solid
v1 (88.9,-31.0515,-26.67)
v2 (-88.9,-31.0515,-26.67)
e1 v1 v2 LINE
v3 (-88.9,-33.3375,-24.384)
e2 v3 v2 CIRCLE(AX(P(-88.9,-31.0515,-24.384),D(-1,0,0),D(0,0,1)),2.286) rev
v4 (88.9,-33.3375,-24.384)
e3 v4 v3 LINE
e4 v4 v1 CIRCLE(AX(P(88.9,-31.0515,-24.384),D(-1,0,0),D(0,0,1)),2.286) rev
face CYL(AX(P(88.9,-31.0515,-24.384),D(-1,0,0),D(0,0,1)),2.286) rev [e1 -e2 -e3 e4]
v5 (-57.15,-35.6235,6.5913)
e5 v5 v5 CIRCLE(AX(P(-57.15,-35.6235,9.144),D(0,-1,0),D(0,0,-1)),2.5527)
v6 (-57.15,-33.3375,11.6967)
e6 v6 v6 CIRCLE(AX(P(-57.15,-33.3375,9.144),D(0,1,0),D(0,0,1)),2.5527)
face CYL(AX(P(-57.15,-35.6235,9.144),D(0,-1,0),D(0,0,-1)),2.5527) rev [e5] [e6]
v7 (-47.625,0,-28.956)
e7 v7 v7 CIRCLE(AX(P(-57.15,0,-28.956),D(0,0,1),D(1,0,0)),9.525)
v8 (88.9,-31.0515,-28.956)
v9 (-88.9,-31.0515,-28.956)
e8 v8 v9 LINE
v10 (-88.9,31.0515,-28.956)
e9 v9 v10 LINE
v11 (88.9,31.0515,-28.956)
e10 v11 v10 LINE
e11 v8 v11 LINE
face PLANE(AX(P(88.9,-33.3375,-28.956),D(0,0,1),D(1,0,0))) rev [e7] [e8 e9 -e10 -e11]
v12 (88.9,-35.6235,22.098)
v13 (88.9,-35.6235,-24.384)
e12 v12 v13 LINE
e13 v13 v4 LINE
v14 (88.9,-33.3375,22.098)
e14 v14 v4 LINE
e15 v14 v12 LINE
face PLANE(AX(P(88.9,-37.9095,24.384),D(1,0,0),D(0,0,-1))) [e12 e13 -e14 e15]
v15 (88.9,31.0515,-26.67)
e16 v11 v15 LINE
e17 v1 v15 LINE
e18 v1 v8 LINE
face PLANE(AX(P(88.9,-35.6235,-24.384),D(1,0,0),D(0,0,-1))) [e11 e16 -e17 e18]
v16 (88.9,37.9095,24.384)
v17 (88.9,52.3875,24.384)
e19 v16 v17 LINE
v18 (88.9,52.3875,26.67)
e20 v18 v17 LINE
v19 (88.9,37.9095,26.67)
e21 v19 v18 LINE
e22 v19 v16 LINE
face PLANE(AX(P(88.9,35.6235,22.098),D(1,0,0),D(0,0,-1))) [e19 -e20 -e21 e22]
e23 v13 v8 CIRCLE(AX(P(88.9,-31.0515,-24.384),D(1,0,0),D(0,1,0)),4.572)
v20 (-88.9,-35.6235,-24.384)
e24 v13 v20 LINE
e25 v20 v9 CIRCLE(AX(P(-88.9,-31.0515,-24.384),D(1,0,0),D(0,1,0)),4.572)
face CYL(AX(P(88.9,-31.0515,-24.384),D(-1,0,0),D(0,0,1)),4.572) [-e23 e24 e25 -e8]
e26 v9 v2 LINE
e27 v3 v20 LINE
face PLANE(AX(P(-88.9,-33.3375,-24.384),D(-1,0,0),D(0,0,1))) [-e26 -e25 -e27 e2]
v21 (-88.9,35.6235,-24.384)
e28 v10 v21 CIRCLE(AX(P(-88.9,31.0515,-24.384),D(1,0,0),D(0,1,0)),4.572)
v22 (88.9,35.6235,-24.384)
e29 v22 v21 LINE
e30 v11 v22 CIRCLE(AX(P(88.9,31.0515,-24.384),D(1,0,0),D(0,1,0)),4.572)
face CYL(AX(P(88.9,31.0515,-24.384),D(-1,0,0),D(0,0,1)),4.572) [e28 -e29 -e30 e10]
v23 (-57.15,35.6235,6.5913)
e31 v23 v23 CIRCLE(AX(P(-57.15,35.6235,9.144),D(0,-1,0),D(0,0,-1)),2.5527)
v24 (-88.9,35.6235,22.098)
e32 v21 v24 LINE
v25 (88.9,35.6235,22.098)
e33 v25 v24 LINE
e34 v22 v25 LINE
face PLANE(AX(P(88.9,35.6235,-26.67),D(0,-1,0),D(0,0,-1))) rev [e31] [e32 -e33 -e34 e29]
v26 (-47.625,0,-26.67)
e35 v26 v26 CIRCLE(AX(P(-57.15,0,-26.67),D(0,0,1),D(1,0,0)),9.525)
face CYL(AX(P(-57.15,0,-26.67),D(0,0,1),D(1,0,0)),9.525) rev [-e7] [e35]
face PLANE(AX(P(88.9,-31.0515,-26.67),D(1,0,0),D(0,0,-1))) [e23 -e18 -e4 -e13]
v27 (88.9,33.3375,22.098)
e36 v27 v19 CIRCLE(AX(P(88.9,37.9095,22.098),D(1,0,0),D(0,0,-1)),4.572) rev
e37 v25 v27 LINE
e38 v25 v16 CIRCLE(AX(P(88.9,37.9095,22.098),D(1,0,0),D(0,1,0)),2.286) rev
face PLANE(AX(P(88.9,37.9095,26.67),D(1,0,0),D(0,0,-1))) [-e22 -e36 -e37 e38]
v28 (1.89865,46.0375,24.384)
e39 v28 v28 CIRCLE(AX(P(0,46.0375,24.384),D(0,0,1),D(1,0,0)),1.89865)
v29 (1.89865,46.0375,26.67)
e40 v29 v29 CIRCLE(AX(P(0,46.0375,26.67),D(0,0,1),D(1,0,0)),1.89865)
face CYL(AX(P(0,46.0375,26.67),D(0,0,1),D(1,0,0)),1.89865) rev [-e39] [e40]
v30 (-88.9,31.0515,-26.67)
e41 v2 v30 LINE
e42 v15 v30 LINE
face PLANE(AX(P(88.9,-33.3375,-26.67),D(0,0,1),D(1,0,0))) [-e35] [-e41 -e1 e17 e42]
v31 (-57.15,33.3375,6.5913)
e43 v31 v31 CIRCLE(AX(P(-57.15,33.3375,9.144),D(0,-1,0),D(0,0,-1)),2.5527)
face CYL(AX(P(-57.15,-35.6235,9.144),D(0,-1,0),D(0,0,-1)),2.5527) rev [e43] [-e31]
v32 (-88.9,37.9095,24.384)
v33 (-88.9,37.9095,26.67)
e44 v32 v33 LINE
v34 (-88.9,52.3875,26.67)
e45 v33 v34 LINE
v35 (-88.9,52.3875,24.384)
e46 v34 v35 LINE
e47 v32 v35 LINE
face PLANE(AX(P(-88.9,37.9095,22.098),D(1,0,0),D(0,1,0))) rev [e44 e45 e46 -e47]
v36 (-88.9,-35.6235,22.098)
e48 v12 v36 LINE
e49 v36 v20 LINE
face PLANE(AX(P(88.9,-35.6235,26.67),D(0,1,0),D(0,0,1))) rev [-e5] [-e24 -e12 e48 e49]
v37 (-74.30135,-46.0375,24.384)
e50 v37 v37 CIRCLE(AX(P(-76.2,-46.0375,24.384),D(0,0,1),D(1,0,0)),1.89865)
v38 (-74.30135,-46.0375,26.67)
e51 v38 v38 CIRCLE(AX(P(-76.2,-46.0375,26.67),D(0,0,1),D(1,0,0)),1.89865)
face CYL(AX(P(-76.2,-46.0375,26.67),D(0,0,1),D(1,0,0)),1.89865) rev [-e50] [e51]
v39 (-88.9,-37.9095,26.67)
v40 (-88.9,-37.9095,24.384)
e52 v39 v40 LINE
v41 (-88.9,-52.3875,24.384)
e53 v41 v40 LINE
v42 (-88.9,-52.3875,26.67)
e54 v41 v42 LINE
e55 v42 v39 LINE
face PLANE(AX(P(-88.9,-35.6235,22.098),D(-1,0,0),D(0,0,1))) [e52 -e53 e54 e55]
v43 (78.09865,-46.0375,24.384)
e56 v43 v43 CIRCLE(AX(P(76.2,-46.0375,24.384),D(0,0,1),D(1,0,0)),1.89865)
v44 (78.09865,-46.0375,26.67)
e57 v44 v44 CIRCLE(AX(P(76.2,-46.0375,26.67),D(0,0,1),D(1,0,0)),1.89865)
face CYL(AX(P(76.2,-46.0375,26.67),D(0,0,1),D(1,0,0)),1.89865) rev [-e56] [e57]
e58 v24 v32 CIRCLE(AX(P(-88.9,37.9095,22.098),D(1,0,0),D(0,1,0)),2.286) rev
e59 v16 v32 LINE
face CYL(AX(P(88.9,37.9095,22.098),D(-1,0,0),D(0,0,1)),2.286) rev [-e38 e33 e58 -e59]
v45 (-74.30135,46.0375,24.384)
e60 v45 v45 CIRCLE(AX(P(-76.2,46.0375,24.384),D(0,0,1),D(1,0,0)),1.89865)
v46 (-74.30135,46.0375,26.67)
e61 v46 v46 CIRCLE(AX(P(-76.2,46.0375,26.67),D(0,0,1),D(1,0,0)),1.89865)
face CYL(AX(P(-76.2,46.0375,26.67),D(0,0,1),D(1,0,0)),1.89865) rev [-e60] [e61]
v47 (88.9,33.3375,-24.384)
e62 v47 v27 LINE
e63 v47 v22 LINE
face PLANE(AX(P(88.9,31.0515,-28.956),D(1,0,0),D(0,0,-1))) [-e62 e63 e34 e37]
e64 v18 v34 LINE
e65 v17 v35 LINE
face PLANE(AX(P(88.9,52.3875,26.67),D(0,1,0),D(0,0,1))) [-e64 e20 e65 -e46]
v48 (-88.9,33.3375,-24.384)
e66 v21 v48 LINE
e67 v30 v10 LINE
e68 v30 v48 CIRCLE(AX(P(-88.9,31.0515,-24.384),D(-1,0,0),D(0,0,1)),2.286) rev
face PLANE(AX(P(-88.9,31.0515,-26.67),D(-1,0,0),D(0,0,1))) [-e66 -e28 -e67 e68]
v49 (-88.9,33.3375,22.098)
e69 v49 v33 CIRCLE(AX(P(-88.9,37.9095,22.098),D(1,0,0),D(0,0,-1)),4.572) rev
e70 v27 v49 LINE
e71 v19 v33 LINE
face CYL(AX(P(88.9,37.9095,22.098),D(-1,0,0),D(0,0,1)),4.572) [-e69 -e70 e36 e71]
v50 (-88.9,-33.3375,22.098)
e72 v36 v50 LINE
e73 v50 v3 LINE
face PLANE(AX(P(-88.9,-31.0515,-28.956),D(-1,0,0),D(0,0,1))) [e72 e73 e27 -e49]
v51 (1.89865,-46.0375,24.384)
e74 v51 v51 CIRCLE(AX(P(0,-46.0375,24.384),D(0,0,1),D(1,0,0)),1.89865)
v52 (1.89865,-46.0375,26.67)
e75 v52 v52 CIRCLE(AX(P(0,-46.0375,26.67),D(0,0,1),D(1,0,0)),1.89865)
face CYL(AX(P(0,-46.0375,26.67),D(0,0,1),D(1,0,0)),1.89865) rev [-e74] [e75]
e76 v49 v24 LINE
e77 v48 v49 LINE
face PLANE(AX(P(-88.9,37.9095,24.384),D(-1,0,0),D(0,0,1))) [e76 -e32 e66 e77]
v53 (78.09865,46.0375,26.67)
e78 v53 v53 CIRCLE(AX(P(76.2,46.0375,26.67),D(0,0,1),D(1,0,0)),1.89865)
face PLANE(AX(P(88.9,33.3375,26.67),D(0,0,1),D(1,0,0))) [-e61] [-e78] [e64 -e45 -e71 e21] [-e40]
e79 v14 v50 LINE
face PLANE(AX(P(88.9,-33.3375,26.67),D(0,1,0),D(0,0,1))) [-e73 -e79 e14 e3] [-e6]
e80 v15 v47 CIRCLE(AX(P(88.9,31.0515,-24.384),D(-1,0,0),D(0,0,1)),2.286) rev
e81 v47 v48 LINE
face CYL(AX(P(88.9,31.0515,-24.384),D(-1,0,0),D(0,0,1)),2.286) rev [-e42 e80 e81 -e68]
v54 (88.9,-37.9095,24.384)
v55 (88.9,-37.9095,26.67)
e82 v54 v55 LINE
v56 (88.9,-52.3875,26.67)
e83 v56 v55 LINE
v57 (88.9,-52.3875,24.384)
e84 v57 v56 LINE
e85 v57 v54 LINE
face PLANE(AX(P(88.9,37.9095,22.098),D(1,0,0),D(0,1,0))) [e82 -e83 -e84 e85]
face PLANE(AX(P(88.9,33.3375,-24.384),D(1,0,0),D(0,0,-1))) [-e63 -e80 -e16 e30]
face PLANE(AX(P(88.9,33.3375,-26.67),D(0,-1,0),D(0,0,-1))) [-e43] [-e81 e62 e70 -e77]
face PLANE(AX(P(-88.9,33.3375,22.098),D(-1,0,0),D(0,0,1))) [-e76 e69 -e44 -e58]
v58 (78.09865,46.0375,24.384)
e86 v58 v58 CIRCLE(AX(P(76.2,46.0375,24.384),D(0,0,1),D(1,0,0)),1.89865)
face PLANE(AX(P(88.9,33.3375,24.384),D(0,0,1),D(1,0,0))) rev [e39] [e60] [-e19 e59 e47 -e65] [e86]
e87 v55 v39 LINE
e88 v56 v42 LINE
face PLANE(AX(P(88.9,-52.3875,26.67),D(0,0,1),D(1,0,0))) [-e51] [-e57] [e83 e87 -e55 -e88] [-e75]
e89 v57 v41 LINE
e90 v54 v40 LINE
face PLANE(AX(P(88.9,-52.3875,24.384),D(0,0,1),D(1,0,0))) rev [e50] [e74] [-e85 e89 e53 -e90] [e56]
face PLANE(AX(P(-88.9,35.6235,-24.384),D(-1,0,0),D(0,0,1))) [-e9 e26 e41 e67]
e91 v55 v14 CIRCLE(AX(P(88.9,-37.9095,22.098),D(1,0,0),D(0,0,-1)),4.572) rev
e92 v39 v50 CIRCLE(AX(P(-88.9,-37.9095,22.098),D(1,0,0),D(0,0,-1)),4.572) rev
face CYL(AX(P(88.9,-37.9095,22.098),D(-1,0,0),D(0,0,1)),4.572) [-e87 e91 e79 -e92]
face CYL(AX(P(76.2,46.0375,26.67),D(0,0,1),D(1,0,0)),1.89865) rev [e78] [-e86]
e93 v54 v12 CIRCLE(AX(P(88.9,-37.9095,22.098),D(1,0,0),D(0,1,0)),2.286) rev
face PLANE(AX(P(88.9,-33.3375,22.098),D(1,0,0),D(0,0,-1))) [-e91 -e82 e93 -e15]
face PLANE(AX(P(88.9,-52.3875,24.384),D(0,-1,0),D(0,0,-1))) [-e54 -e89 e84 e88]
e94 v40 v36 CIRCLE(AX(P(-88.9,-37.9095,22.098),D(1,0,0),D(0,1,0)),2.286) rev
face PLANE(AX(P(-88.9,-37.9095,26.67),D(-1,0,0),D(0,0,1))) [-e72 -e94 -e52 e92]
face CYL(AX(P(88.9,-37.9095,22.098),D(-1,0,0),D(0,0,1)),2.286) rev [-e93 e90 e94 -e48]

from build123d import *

# Parameters (mm, degrees)
BASE_FLANGE1_DEPTH           = 88.9
F_25_0_1495_DIAMETER_HOLE1_D = 3.7973
F_7_0_201_DIAMETER_HOLE1_D   = 5.1054
F_3_4_0_75_DIAMETER_HOLE1_D  = 19.05


# Sheet-metal steps are written as plain solids
with BuildPart() as part:
    # Sketch1 → Base-Flange1 (new, symmetric)
    with BuildSketch(Plane.YZ):
        with BuildLine():
            Line((-52.3875, 26.67), (-37.9095, 26.67))
            ThreePointArc((-37.9095, 26.67), (-34.676607796, 25.330892204), (-33.3375, 22.098))
            Line((-33.3375, 22.098), (-33.3375, -24.384))
            ThreePointArc((-33.3375, -24.384), (-32.667946102, -26.000446102), (-31.0515, -26.67))
            Line((-31.0515, -26.67), (31.0515, -26.67))
            ThreePointArc((31.0515, -26.67), (32.667946102, -26.000446102), (33.3375, -24.384))
            Line((33.3375, -24.384), (33.3375, 22.098))
            ThreePointArc((33.3375, 22.098), (34.676607796, 25.330892204), (37.9095, 26.67))
            Line((37.9095, 26.67), (52.3875, 26.67))
            Line((52.3875, 26.67), (52.3875, 24.384))
            Line((52.3875, 24.384), (37.9095, 24.384))
            ThreePointArc((37.9095, 24.384), (36.293053898, 23.714446102), (35.6235, 22.098))
            Line((35.6235, 22.098), (35.6235, -24.384))
            ThreePointArc((35.6235, -24.384), (34.284392204, -27.616892204), (31.0515, -28.956))
            Line((31.0515, -28.956), (-31.0515, -28.956))
            ThreePointArc((-31.0515, -28.956), (-34.284392204, -27.616892204), (-35.6235, -24.384))
            Line((-35.6235, -24.384), (-35.6235, 22.098))
            ThreePointArc((-35.6235, 22.098), (-36.293053898, 23.714446102), (-37.9095, 24.384))
            Line((-37.9095, 24.384), (-52.3875, 24.384))
            Line((-52.3875, 24.384), (-52.3875, 26.67))
        make_face()
    extrude(amount=BASE_FLANGE1_DEPTH, both=True)

    # #25 (0.1495) Diameter Hole1 (through all)
    with Locations(Plane.XY.offset(26.67)):
        with Locations((-76.2, 46.0375), (0, 46.0375), (76.2, 46.0375), (76.2, -46.0375), (0, -46.0375), (-76.2, -46.0375)):
            Hole(F_25_0_1495_DIAMETER_HOLE1_D / 2)

    # #7 (0.201) Diameter Hole1 (through all)
    with Locations(Plane.XZ.offset(35.6235)):
        with Locations((-57.15, 9.144)):
            Hole(F_7_0_201_DIAMETER_HOLE1_D / 2)

    # 3/4 (0.75) Diameter Hole1 (through all)
    with Locations(Plane.XY.offset(-26.67)):
        with Locations((-57.15, 0)):
            Hole(F_3_4_0_75_DIAMETER_HOLE1_D / 2)


solid = part.part
